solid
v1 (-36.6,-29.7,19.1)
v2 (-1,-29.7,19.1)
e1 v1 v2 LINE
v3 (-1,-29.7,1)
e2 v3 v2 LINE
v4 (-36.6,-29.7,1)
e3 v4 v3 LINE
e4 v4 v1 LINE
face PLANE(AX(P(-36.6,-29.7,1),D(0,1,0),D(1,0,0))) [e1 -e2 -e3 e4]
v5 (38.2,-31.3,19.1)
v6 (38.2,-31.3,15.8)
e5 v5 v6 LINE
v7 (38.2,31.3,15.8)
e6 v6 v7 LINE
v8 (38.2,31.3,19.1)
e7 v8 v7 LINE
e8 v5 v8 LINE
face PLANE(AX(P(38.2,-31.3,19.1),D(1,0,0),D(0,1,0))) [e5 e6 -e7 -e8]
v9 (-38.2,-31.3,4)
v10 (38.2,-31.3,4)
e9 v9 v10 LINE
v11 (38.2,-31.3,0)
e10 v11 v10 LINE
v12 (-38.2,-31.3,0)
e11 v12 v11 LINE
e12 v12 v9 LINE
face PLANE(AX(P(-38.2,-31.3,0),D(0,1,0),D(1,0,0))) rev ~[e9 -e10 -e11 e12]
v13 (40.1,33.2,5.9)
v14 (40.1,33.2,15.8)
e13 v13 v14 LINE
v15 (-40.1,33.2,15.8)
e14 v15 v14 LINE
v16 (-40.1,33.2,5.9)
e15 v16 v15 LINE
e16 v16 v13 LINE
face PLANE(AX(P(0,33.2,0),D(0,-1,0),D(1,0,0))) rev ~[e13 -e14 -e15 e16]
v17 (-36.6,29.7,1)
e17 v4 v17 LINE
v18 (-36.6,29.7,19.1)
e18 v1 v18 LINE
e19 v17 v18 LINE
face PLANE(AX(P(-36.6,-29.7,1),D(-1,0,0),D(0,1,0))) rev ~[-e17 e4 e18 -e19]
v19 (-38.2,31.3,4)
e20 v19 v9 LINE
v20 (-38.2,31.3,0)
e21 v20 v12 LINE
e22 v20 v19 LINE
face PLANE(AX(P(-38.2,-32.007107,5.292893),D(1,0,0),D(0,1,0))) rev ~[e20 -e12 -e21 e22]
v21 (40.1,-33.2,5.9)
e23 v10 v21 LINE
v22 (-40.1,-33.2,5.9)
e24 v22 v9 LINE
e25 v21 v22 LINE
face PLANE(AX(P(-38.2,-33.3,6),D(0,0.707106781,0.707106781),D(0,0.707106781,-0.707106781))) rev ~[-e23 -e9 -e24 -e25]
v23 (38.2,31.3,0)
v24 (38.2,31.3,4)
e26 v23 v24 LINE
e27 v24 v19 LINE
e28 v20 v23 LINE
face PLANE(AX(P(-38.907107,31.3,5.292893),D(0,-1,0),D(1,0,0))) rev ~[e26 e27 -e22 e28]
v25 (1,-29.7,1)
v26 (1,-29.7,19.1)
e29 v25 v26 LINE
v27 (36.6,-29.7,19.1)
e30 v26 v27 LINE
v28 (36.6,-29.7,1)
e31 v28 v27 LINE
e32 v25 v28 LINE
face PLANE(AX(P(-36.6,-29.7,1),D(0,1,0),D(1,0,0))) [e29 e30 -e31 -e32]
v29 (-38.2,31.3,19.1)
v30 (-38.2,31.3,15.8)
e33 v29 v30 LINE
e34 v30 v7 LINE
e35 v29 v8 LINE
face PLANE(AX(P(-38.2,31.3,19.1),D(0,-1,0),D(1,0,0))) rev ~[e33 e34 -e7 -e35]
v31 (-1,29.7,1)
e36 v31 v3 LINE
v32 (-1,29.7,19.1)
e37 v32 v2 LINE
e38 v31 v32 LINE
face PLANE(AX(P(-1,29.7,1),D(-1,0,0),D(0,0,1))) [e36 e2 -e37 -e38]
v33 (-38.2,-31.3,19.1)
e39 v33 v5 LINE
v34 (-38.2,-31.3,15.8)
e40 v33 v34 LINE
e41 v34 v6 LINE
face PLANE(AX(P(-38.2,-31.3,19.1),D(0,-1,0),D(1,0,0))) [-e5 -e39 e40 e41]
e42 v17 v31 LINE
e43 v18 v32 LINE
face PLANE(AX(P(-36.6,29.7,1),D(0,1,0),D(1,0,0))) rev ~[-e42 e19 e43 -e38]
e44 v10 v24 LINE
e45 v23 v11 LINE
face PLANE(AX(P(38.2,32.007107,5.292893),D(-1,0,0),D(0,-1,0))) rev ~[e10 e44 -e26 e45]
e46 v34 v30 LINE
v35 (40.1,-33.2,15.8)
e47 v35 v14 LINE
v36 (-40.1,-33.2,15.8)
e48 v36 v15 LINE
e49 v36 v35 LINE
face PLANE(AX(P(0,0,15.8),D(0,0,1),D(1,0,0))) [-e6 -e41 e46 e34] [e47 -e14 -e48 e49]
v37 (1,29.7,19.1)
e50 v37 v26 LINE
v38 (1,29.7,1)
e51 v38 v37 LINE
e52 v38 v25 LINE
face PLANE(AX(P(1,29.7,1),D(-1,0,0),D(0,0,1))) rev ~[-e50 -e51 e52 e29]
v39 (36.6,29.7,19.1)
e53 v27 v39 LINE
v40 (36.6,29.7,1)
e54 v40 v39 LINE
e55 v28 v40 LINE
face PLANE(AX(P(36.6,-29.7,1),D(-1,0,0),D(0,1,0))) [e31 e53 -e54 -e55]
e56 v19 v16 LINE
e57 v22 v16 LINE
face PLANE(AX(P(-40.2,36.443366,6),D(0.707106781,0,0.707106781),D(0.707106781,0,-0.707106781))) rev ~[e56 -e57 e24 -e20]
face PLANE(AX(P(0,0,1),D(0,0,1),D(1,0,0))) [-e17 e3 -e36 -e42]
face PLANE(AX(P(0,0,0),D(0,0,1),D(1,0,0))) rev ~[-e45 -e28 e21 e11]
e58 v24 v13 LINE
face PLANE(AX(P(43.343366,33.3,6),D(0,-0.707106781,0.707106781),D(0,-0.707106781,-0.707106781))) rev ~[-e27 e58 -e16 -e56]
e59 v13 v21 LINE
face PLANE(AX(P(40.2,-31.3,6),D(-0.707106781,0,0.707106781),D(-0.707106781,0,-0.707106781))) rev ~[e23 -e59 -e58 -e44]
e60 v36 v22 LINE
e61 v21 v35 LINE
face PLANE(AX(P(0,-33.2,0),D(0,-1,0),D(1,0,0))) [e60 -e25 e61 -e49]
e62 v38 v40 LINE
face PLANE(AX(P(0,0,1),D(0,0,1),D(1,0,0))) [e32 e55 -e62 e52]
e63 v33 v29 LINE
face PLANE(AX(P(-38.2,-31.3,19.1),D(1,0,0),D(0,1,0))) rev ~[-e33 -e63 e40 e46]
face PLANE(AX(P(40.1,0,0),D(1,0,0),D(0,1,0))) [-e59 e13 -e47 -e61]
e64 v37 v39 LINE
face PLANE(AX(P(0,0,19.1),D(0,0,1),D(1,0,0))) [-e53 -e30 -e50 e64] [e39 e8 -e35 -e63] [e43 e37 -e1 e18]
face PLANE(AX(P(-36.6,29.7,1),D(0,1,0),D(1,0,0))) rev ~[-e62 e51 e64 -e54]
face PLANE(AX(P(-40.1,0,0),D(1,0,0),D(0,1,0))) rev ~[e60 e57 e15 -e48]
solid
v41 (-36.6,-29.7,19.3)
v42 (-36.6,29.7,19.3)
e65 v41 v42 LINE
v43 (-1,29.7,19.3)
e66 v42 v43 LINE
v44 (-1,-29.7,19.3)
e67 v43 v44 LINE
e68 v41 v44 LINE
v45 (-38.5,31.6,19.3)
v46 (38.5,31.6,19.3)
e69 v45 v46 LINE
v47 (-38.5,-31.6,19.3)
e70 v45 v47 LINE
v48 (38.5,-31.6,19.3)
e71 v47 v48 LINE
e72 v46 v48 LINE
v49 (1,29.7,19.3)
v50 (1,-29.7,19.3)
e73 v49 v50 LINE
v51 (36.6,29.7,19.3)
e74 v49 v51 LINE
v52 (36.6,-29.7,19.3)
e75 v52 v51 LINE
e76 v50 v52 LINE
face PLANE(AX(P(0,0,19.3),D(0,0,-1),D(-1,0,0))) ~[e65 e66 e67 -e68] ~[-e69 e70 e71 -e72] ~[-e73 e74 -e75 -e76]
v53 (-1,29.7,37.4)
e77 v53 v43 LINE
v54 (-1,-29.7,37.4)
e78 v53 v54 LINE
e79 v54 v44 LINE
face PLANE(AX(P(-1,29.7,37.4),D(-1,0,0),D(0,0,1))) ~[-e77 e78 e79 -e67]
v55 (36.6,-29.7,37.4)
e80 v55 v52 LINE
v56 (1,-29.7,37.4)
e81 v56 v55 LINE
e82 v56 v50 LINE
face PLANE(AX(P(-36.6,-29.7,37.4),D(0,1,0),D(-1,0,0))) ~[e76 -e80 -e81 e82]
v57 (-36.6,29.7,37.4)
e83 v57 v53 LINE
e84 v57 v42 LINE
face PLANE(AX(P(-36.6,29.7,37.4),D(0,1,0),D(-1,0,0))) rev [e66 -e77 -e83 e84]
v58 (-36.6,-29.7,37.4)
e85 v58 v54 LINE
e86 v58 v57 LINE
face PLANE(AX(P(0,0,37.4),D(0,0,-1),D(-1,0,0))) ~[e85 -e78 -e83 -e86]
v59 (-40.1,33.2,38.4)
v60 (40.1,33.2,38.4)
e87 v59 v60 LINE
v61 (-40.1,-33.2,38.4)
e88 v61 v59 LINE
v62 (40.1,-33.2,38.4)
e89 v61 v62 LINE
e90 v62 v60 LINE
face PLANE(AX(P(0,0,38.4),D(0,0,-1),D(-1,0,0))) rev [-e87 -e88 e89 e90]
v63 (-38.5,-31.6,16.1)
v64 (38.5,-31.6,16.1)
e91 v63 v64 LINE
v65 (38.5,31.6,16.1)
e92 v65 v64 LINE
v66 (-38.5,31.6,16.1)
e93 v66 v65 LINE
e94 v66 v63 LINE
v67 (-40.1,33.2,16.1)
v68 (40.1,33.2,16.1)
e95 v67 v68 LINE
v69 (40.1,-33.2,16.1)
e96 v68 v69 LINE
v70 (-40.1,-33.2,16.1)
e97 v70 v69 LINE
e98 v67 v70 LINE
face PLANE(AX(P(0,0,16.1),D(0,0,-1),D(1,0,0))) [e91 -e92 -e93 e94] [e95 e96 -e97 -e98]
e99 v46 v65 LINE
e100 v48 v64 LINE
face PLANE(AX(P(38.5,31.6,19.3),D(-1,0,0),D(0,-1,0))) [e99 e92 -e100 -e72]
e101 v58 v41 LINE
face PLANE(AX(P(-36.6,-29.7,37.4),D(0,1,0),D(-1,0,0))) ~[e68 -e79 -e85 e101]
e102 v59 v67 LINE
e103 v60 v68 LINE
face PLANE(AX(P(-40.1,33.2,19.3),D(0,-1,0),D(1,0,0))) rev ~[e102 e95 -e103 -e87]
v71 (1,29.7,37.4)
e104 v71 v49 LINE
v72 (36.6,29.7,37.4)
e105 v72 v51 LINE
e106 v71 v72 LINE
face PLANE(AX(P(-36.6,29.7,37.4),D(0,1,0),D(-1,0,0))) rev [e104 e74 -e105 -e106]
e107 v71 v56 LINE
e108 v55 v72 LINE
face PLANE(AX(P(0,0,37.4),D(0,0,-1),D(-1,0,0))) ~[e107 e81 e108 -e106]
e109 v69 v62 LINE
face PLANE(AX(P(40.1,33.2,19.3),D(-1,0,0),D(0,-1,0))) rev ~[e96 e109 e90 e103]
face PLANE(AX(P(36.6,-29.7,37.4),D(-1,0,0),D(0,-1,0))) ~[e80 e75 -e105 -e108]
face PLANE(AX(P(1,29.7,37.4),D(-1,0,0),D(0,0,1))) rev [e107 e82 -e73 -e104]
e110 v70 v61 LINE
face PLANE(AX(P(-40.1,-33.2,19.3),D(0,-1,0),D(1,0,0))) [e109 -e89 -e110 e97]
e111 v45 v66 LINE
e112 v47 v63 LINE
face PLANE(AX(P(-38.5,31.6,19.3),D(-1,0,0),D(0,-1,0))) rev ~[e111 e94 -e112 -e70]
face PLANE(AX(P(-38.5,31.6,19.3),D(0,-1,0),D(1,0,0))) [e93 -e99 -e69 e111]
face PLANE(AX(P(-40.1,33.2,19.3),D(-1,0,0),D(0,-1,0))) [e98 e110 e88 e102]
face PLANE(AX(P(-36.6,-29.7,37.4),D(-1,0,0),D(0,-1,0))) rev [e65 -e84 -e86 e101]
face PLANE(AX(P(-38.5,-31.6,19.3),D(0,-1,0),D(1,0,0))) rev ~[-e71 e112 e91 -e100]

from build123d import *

# Parameters (mm, degrees)
F4_W          = 80.2
F4_H          = 66.4
F5_DEPTH      = 1
F6_W          = 80.2
F6_H          = 66.4
F6_W_2        = 73.2
F6_H_2        = 59.4
F7_DEPTH      = 18.1
F8_W          = 2
F8_H          = 18.1
F9_DEPTH      = 59.4
F12_W         = 80.2
F12_H         = 66.4
F12_W_2       = 76.4
F12_H_2       = 62.6
F13_DEPTH     = 3.3
F14_W         = 80.2
F14_H         = 66.4
F14_W_2       = 76.4
F14_H_2       = 62.6
F15_DEPTH     = 6
F16_T4_DEPTH  = 76.4
F16_T9_DEPTH  = 62.6
F16_T14_DEPTH = 76.4
F16_T19_DEPTH = 62.6
F16_T25_DEPTH = 81.5433659759
F16_T31_DEPTH = 67.7433659759
F16_T40_DEPTH = 81.5433659759
F16_T46_DEPTH = 67.7433659759
F16_T55_DEPTH = 81.5433659759
F16_T61_DEPTH = 67.7433659759
F16_T70_DEPTH = 67.7433659759
F16_T76_DEPTH = 81.5433659759
F17_W         = 80.2
F17_H         = 66.4
F17_W_2       = 77
F17_H_2       = 63.2
F18_DEPTH     = 3.2


# Not quite as in the source:
# - a fillet or chamfer that OpenCascade refuses, or shapes differently, is made with other operations: its cross-section is extruded or revolved along the edge and cut away or added
# - a feature names something its author has since deleted; it is built from what else it names


with BuildPart() as f5:
    # F4 (on Top) → F5 (new body)
    with BuildSketch(Plane.XY):
        Rectangle(F4_W, F4_H)
    extrude(amount=F5_DEPTH)

    # F6 (on face) → F7 (join)
    with BuildSketch(Plane.XY.offset(1)):
        Rectangle(F6_W, F6_H)
        Rectangle(F6_W_2, F6_H_2, mode=Mode.SUBTRACT)
    extrude(amount=F7_DEPTH)

    # F8 (on face) → F9 (join, through all)
    with BuildSketch(Plane.XZ.offset(-29.7)):
        with Locations((0, 10.05)):
            Rectangle(F8_W, F8_H)
    extrude(amount=F9_DEPTH)


with BuildPart() as f11_1:
    # F11: instance of F5
    add(f5.part.mirror(Plane.XY.offset(19.2)))

    # F17 (on face) → F18 (join)
    with BuildSketch(Plane(origin=(0, 0, 19.3), x_dir=(1, 0, 0), z_dir=(0, 0, -1))):
        Rectangle(F17_W, F17_H)
        Rectangle(F17_W_2, F17_H_2, mode=Mode.SUBTRACT)
    extrude(amount=F18_DEPTH)


with BuildPart() as f5_1:
    add(f5.part)

    # F12 (on face) → F13 (cut)
    with BuildSketch(Plane.XY.offset(19.1)):
        Rectangle(F12_W, F12_H)
        Rectangle(F12_W_2, F12_H_2, mode=Mode.SUBTRACT)
    extrude(amount=-F13_DEPTH, mode=Mode.SUBTRACT)

    # F14 (on face) → F15 (cut)
    with BuildSketch(Plane(origin=(0, 0, 0), x_dir=(1, 0, 0), z_dir=(0, 0, -1))):
        Rectangle(F14_W, F14_H)
        Rectangle(F14_W_2, F14_H_2, mode=Mode.SUBTRACT)
    extrude(amount=-F15_DEPTH, mode=Mode.SUBTRACT)

    # F16: chamfer of 2 on 4 edges, made by hand


with BuildPart() as f16_tool2:
    # F16_s3 → F16_t4 (new body)
    with BuildSketch(Plane.YZ.offset(-38.2)):
        Polygon((-33.3, 6), (-31.3, 4), (-31.3, 6), align=None)
    extrude(amount=F16_T4_DEPTH)

    split(bisect_by=Plane.XZ.offset(33.2), keep=Keep.BOTTOM)


with BuildPart() as f5_2:
    add(f5_1.part)

    # F16_t1: union F16_tool2
    add(f16_tool2.part)


with BuildPart() as f16_tool7:
    # F16_s8 → F16_t9 (new body)
    with BuildSketch(Plane.XZ.offset(-31.3)):
        Polygon((-40.2, 6), (-38.2, 4), (-38.2, 6), align=None)
    extrude(amount=F16_T9_DEPTH)

    split(bisect_by=Plane.YZ.offset(-40.1), keep=Keep.TOP)


with BuildPart() as f5_3:
    add(f5_2.part)

    # F16_t6: union F16_tool7
    add(f16_tool7.part)


with BuildPart() as f16_tool12:
    # F16_s13 → F16_t14 (new body)
    with BuildSketch(Plane.YZ.offset(38.2)):
        Polygon((33.3, 6), (31.3, 4), (31.3, 6), align=None)
    extrude(amount=-F16_T14_DEPTH)

    split(bisect_by=Plane.XZ.offset(-33.2), keep=Keep.TOP)


with BuildPart() as f5_4:
    add(f5_3.part)

    # F16_t11: union F16_tool12
    add(f16_tool12.part)


with BuildPart() as f16_tool17:
    # F16_s18 → F16_t19 (new body)
    with BuildSketch(Plane.XZ.offset(31.3)):
        Polygon((40.2, 6), (38.2, 4), (38.2, 6), align=None)
    extrude(amount=-F16_T19_DEPTH)

    split(bisect_by=Plane.YZ.offset(40.1), keep=Keep.BOTTOM)


with BuildPart() as f5_5:
    add(f5_4.part)

    # F16_t16: union F16_tool17
    add(f16_tool17.part)


with BuildPart() as f16_tool23:
    # F16_s24 → F16_t25 (new body)
    with BuildSketch(Plane.YZ.offset(-43.3433659759)):
        Polygon((-33.3, 6), (-31.3, 4), (-31.3, 6), align=None)
    extrude(amount=F16_T25_DEPTH)

    split(bisect_by=Plane.XZ.offset(33.2), keep=Keep.BOTTOM)

    split(bisect_by=Plane.YZ.offset(-40.1), keep=Keep.TOP)

    split(bisect_by=Plane.YZ.offset(-38.2), keep=Keep.BOTTOM)


with BuildPart() as f16_tool29:
    # F16_s30 → F16_t31 (new body)
    with BuildSketch(Plane.XZ.offset(-31.3)):
        Polygon((-40.2, 6), (-38.2, 4), (-38.2, 6), align=None)
    extrude(amount=F16_T31_DEPTH)

    split(bisect_by=Plane.XZ.offset(33.2), keep=Keep.BOTTOM)

    split(bisect_by=Plane.YZ.offset(-40.1), keep=Keep.TOP)

    split(bisect_by=Plane.XZ.offset(31.3), keep=Keep.TOP)


with BuildPart() as f16_tool23_1:
    add(f16_tool23.part)

    # F16_t35: intersect F16_tool29
    add(f16_tool29.part, mode=Mode.INTERSECT)


with BuildPart() as f5_6:
    add(f5_5.part)

    # F16_t21: union F16_tool23
    add(f16_tool23_1.part)


with BuildPart() as f16_tool38:
    # F16_s39 → F16_t40 (new body)
    with BuildSketch(Plane.YZ.offset(-38.2)):
        Polygon((-33.3, 6), (-31.3, 4), (-31.3, 6), align=None)
    extrude(amount=F16_T40_DEPTH)

    split(bisect_by=Plane.XZ.offset(33.2), keep=Keep.BOTTOM)

    split(bisect_by=Plane.YZ.offset(40.1), keep=Keep.BOTTOM)

    split(bisect_by=Plane.YZ.offset(38.2), keep=Keep.TOP)


with BuildPart() as f16_tool44:
    # F16_s45 → F16_t46 (new body)
    with BuildSketch(Plane.XZ.offset(36.4433659759)):
        Polygon((40.2, 6), (38.2, 4), (38.2, 6), align=None)
    extrude(amount=-F16_T46_DEPTH)

    split(bisect_by=Plane.XZ.offset(33.2), keep=Keep.BOTTOM)

    split(bisect_by=Plane.YZ.offset(40.1), keep=Keep.BOTTOM)

    split(bisect_by=Plane.XZ.offset(31.3), keep=Keep.TOP)


with BuildPart() as f16_tool38_1:
    add(f16_tool38.part)

    # F16_t50: intersect F16_tool44
    add(f16_tool44.part, mode=Mode.INTERSECT)


with BuildPart() as f5_7:
    add(f5_6.part)

    # F16_t36: union F16_tool38
    add(f16_tool38_1.part)


with BuildPart() as f16_tool53:
    # F16_s54 → F16_t55 (new body)
    with BuildSketch(Plane.YZ.offset(38.2)):
        Polygon((33.3, 6), (31.3, 4), (31.3, 6), align=None)
    extrude(amount=-F16_T55_DEPTH)

    split(bisect_by=Plane.YZ.offset(-40.1), keep=Keep.TOP)

    split(bisect_by=Plane.XZ.offset(-33.2), keep=Keep.TOP)

    split(bisect_by=Plane.YZ.offset(-38.2), keep=Keep.BOTTOM)


with BuildPart() as f16_tool59:
    # F16_s60 → F16_t61 (new body)
    with BuildSketch(Plane.XZ.offset(-36.4433659759)):
        Polygon((-40.2, 6), (-38.2, 4), (-38.2, 6), align=None)
    extrude(amount=F16_T61_DEPTH)

    split(bisect_by=Plane.YZ.offset(-40.1), keep=Keep.TOP)

    split(bisect_by=Plane.XZ.offset(-33.2), keep=Keep.TOP)

    split(bisect_by=Plane.XZ.offset(-31.3), keep=Keep.BOTTOM)


with BuildPart() as f16_tool53_1:
    add(f16_tool53.part)

    # F16_t65: intersect F16_tool59
    add(f16_tool59.part, mode=Mode.INTERSECT)


with BuildPart() as f5_8:
    add(f5_7.part)

    # F16_t51: union F16_tool53
    add(f16_tool53_1.part)


with BuildPart() as f16_tool68:
    # F16_s69 → F16_t70 (new body)
    with BuildSketch(Plane.XZ.offset(31.3)):
        Polygon((40.2, 6), (38.2, 4), (38.2, 6), align=None)
    extrude(amount=-F16_T70_DEPTH)

    split(bisect_by=Plane.YZ.offset(40.1), keep=Keep.BOTTOM)

    split(bisect_by=Plane.XZ.offset(-33.2), keep=Keep.TOP)

    split(bisect_by=Plane.XZ.offset(-31.3), keep=Keep.BOTTOM)


with BuildPart() as f16_tool74:
    # F16_s75 → F16_t76 (new body)
    with BuildSketch(Plane.YZ.offset(43.3433659759)):
        Polygon((33.3, 6), (31.3, 4), (31.3, 6), align=None)
    extrude(amount=-F16_T76_DEPTH)

    split(bisect_by=Plane.YZ.offset(40.1), keep=Keep.BOTTOM)

    split(bisect_by=Plane.XZ.offset(-33.2), keep=Keep.TOP)

    split(bisect_by=Plane.YZ.offset(38.2), keep=Keep.TOP)


with BuildPart() as f16_tool68_1:
    add(f16_tool68.part)

    # F16_t80: intersect F16_tool74
    add(f16_tool74.part, mode=Mode.INTERSECT)


with BuildPart() as f5_9:
    add(f5_8.part)

    # F16_t66: union F16_tool68
    add(f16_tool68_1.part)


solid = Compound([f11_1.part, f5_9.part])
